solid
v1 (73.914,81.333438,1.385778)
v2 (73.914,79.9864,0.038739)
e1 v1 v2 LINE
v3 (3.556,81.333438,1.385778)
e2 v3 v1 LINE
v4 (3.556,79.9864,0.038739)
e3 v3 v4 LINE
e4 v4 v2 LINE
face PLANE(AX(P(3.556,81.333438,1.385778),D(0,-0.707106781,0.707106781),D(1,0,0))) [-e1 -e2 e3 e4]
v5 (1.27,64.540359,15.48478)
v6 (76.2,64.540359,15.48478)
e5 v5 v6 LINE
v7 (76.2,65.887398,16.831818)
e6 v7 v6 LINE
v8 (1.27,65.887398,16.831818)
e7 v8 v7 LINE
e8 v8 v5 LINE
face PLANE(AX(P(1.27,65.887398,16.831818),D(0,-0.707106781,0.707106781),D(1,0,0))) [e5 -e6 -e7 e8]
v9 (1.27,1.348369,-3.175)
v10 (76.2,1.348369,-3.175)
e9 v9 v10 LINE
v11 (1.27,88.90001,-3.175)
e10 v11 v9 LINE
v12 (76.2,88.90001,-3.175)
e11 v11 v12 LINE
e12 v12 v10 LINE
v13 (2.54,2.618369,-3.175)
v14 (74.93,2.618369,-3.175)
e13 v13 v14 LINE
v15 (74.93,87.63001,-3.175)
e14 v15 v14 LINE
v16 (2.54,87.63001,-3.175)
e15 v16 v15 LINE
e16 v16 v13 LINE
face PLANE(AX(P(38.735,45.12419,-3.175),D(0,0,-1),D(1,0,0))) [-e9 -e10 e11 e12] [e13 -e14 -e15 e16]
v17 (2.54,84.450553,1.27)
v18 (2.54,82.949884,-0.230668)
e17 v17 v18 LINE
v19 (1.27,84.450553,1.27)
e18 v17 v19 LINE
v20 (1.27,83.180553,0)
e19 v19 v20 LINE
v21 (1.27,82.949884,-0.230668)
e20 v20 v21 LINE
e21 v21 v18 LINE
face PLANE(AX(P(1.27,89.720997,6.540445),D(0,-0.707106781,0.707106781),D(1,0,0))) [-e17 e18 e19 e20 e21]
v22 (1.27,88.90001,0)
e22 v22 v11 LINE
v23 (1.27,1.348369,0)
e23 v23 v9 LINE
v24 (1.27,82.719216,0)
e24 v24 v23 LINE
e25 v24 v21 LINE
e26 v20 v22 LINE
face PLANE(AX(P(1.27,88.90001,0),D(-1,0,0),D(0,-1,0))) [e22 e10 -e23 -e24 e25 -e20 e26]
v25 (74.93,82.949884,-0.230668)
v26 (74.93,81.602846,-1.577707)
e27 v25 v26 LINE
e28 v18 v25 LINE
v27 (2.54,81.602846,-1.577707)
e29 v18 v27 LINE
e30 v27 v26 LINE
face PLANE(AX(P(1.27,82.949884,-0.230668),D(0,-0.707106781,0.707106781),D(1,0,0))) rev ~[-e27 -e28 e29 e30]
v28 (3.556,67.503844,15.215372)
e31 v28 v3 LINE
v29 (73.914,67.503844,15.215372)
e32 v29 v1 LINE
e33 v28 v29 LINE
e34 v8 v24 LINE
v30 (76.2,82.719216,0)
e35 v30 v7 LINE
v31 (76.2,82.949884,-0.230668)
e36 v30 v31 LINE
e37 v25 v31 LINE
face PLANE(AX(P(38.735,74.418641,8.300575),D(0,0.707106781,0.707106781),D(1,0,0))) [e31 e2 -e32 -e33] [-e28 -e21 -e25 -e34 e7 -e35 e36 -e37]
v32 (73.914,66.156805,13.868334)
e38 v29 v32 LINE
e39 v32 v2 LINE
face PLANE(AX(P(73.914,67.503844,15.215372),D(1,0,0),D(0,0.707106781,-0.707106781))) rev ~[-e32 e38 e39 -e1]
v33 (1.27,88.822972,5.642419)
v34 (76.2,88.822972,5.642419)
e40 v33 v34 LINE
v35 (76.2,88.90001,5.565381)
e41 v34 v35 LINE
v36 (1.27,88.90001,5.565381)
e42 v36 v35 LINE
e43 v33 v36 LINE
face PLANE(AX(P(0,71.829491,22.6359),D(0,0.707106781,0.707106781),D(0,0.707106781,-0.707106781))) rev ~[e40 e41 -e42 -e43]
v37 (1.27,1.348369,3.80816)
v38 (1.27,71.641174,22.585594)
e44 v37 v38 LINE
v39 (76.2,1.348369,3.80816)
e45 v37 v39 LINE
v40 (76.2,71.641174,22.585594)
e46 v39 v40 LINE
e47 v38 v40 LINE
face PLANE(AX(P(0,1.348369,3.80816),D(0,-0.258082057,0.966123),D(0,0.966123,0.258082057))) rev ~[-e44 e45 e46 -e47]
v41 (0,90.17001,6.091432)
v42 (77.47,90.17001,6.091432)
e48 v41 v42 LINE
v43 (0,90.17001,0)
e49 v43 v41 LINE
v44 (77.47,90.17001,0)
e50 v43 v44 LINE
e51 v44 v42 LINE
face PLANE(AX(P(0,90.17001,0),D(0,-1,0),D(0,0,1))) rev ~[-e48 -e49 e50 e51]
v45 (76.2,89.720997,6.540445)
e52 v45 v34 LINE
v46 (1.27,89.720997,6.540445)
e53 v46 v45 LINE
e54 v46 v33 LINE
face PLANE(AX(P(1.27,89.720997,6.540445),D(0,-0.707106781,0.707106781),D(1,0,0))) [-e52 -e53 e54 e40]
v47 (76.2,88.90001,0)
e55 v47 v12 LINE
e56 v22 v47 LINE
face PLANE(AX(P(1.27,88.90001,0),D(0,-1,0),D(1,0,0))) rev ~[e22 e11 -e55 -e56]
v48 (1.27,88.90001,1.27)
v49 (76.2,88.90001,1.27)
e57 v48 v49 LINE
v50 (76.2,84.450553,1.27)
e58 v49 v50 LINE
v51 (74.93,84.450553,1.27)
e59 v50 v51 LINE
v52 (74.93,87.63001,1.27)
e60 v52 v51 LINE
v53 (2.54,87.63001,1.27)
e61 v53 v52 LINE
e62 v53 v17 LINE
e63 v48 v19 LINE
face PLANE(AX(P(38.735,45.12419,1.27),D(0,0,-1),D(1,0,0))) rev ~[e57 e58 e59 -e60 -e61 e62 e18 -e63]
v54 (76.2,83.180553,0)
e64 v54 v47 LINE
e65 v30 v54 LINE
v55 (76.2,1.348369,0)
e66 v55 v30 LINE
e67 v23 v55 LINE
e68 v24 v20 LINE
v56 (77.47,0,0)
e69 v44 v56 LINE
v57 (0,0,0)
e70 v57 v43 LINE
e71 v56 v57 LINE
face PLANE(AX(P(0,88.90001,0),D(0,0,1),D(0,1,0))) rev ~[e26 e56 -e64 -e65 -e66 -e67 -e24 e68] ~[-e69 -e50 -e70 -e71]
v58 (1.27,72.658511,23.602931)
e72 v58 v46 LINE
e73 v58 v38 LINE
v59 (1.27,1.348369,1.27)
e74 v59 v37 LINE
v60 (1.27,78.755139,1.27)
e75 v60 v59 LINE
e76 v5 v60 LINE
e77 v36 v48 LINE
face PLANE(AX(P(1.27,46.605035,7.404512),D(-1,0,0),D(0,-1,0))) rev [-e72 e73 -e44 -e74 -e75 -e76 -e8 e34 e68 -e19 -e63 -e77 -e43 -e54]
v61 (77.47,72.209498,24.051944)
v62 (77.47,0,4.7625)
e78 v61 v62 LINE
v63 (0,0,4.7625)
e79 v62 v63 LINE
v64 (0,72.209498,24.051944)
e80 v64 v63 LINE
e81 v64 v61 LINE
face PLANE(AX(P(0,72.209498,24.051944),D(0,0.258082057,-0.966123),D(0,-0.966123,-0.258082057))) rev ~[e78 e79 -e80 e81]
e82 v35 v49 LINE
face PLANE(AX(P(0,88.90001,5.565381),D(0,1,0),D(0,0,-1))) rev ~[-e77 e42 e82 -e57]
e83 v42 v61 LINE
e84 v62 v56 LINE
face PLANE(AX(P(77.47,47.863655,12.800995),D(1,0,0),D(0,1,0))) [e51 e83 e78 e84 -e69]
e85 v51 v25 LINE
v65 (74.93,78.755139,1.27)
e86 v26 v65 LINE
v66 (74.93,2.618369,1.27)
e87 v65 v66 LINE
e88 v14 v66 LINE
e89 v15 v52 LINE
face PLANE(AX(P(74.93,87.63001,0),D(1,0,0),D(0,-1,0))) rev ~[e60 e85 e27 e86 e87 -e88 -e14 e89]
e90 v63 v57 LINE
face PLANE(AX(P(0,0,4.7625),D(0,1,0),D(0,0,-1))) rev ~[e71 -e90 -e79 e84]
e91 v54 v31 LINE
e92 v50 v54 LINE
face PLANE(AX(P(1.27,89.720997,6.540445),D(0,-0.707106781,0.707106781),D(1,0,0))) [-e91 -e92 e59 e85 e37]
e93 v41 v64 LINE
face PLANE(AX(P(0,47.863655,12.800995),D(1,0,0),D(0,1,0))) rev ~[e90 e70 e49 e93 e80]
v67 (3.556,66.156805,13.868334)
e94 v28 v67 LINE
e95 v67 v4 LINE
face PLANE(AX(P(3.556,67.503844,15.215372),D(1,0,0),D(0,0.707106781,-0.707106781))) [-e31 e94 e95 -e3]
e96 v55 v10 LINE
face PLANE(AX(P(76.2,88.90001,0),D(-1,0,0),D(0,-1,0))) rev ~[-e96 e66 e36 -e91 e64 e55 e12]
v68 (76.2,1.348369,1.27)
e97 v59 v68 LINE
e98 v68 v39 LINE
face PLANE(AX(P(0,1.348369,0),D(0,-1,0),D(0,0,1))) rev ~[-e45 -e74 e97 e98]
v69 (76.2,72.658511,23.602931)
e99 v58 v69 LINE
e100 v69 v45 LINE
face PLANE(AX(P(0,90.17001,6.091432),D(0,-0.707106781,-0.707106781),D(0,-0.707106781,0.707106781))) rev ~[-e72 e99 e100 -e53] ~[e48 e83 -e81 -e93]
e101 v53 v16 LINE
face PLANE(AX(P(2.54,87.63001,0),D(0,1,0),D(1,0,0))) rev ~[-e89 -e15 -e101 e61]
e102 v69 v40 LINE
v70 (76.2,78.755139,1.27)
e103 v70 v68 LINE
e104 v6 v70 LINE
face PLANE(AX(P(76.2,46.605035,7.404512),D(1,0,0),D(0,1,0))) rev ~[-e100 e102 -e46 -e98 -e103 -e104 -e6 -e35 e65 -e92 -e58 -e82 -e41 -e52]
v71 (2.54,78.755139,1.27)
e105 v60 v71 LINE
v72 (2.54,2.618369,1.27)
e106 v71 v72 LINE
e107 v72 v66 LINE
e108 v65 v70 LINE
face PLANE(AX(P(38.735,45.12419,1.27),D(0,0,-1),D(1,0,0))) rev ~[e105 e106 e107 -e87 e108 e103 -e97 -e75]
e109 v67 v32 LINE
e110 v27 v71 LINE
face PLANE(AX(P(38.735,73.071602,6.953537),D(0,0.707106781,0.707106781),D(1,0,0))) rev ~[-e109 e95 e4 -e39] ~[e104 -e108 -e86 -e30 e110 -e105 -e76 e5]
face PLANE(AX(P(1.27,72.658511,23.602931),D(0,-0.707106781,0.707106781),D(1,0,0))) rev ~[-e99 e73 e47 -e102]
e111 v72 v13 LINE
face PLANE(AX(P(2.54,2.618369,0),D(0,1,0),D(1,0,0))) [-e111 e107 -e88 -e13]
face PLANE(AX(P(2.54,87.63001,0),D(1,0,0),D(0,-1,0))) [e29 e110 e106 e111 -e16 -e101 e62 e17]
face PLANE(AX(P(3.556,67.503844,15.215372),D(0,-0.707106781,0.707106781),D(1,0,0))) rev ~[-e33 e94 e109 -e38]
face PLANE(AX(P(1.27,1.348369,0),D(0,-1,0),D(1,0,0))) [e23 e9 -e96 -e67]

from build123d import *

# Parameters (mm, degrees)
F1_DEPTH      = 77.47
F3_DEPTH      = 1.27
F5_W          = 74.93
F5_H          = 87.551641
F5_W_2        = 72.39
F5_H_2        = 85.011641
F6_DEPTH      = 3.175
F6_DEPTH_BACK = 1.27
F7_W          = 74.93
F7_H          = 24.13
F8_DEPTH      = 9.5758
F10_W         = 74.93
F10_H         = 24.13
F10_W_2       = 70.358
F10_H_2       = 19.558
F11_DEPTH     = 1.905


# Not quite as in the source:
# - a pattern or mirror of a feature is missing from the dataset's text; its kind, count and spacing are read off the source's solid


with BuildPart() as f1:
    # F0 (on Right) → F1 (new body)
    with BuildSketch(Plane.YZ):
        Polygon((88.9000101356, 0), (90.1700101356, 0), (90.1700101356, 6.0914319939), (72.2094978935, 24.0519442361), (0, 4.7625), (0, 0), (1.3483691356, 0), (1.3483691356, 3.8081596938), (71.8294909699, 22.6358999354), (88.9000101356, 5.5653807697), align=None)
    extrude(amount=F1_DEPTH)

    # F2 (on face) → F3 (join)
    with BuildSketch(Plane.YZ.offset(77.47)):
        Polygon((0, 0), (90.1700101356, 0), (90.1700101356, 6.0914319939), (72.2094978935, 24.0519442361), (0, 4.7625), align=None)
    f3 = extrude(amount=-F3_DEPTH)

    # F3_copies: F3 across plane
    add(f3.mirror(Plane(origin=(38.735, 0, 0), x_dir=(0, 0, -1), z_dir=(-1, 0, 0))))

    # F5 (on face) → F6 (join, two sides)
    with BuildSketch(Plane(origin=(0, 0, 0), x_dir=(1, 0, 0), z_dir=(0, 0, -1))) as f6_sk:
        with Locations((38.735, -45.1241896356)):
            Rectangle(F5_W, F5_H)
        with Locations((38.735, -45.1241896356)):
            Rectangle(F5_W_2, F5_H_2, mode=Mode.SUBTRACT)
    extrude(amount=F6_DEPTH)
    extrude(f6_sk.sketch, amount=-F6_DEPTH_BACK)

    # F7 (on face) → F8 (cut)
    with BuildSketch(Plane(origin=(0, 48.1307210648, 48.1307210648), x_dir=(1, 0, 0), z_dir=(0, 0.7071067812, 0.7071067812))):
        with Locations((38.735, 46.7525327565)):
            Rectangle(F7_W, F7_H)
    extrude(amount=-F8_DEPTH, mode=Mode.SUBTRACT)

    # F10 (on offset) → F11 (join)
    with BuildSketch(Plane(origin=(0, 41.3596079495, 41.3596079495), x_dir=(1, 0, 0), z_dir=(0, 0.7071067812, 0.7071067812))):
        with Locations((38.735, 46.7525327565)):
            Rectangle(F10_W, F10_H)
        with Locations((38.735, 46.7525327565)):
            Rectangle(F10_W_2, F10_H_2, mode=Mode.SUBTRACT)
    extrude(amount=-F11_DEPTH)


solid = f1.part
